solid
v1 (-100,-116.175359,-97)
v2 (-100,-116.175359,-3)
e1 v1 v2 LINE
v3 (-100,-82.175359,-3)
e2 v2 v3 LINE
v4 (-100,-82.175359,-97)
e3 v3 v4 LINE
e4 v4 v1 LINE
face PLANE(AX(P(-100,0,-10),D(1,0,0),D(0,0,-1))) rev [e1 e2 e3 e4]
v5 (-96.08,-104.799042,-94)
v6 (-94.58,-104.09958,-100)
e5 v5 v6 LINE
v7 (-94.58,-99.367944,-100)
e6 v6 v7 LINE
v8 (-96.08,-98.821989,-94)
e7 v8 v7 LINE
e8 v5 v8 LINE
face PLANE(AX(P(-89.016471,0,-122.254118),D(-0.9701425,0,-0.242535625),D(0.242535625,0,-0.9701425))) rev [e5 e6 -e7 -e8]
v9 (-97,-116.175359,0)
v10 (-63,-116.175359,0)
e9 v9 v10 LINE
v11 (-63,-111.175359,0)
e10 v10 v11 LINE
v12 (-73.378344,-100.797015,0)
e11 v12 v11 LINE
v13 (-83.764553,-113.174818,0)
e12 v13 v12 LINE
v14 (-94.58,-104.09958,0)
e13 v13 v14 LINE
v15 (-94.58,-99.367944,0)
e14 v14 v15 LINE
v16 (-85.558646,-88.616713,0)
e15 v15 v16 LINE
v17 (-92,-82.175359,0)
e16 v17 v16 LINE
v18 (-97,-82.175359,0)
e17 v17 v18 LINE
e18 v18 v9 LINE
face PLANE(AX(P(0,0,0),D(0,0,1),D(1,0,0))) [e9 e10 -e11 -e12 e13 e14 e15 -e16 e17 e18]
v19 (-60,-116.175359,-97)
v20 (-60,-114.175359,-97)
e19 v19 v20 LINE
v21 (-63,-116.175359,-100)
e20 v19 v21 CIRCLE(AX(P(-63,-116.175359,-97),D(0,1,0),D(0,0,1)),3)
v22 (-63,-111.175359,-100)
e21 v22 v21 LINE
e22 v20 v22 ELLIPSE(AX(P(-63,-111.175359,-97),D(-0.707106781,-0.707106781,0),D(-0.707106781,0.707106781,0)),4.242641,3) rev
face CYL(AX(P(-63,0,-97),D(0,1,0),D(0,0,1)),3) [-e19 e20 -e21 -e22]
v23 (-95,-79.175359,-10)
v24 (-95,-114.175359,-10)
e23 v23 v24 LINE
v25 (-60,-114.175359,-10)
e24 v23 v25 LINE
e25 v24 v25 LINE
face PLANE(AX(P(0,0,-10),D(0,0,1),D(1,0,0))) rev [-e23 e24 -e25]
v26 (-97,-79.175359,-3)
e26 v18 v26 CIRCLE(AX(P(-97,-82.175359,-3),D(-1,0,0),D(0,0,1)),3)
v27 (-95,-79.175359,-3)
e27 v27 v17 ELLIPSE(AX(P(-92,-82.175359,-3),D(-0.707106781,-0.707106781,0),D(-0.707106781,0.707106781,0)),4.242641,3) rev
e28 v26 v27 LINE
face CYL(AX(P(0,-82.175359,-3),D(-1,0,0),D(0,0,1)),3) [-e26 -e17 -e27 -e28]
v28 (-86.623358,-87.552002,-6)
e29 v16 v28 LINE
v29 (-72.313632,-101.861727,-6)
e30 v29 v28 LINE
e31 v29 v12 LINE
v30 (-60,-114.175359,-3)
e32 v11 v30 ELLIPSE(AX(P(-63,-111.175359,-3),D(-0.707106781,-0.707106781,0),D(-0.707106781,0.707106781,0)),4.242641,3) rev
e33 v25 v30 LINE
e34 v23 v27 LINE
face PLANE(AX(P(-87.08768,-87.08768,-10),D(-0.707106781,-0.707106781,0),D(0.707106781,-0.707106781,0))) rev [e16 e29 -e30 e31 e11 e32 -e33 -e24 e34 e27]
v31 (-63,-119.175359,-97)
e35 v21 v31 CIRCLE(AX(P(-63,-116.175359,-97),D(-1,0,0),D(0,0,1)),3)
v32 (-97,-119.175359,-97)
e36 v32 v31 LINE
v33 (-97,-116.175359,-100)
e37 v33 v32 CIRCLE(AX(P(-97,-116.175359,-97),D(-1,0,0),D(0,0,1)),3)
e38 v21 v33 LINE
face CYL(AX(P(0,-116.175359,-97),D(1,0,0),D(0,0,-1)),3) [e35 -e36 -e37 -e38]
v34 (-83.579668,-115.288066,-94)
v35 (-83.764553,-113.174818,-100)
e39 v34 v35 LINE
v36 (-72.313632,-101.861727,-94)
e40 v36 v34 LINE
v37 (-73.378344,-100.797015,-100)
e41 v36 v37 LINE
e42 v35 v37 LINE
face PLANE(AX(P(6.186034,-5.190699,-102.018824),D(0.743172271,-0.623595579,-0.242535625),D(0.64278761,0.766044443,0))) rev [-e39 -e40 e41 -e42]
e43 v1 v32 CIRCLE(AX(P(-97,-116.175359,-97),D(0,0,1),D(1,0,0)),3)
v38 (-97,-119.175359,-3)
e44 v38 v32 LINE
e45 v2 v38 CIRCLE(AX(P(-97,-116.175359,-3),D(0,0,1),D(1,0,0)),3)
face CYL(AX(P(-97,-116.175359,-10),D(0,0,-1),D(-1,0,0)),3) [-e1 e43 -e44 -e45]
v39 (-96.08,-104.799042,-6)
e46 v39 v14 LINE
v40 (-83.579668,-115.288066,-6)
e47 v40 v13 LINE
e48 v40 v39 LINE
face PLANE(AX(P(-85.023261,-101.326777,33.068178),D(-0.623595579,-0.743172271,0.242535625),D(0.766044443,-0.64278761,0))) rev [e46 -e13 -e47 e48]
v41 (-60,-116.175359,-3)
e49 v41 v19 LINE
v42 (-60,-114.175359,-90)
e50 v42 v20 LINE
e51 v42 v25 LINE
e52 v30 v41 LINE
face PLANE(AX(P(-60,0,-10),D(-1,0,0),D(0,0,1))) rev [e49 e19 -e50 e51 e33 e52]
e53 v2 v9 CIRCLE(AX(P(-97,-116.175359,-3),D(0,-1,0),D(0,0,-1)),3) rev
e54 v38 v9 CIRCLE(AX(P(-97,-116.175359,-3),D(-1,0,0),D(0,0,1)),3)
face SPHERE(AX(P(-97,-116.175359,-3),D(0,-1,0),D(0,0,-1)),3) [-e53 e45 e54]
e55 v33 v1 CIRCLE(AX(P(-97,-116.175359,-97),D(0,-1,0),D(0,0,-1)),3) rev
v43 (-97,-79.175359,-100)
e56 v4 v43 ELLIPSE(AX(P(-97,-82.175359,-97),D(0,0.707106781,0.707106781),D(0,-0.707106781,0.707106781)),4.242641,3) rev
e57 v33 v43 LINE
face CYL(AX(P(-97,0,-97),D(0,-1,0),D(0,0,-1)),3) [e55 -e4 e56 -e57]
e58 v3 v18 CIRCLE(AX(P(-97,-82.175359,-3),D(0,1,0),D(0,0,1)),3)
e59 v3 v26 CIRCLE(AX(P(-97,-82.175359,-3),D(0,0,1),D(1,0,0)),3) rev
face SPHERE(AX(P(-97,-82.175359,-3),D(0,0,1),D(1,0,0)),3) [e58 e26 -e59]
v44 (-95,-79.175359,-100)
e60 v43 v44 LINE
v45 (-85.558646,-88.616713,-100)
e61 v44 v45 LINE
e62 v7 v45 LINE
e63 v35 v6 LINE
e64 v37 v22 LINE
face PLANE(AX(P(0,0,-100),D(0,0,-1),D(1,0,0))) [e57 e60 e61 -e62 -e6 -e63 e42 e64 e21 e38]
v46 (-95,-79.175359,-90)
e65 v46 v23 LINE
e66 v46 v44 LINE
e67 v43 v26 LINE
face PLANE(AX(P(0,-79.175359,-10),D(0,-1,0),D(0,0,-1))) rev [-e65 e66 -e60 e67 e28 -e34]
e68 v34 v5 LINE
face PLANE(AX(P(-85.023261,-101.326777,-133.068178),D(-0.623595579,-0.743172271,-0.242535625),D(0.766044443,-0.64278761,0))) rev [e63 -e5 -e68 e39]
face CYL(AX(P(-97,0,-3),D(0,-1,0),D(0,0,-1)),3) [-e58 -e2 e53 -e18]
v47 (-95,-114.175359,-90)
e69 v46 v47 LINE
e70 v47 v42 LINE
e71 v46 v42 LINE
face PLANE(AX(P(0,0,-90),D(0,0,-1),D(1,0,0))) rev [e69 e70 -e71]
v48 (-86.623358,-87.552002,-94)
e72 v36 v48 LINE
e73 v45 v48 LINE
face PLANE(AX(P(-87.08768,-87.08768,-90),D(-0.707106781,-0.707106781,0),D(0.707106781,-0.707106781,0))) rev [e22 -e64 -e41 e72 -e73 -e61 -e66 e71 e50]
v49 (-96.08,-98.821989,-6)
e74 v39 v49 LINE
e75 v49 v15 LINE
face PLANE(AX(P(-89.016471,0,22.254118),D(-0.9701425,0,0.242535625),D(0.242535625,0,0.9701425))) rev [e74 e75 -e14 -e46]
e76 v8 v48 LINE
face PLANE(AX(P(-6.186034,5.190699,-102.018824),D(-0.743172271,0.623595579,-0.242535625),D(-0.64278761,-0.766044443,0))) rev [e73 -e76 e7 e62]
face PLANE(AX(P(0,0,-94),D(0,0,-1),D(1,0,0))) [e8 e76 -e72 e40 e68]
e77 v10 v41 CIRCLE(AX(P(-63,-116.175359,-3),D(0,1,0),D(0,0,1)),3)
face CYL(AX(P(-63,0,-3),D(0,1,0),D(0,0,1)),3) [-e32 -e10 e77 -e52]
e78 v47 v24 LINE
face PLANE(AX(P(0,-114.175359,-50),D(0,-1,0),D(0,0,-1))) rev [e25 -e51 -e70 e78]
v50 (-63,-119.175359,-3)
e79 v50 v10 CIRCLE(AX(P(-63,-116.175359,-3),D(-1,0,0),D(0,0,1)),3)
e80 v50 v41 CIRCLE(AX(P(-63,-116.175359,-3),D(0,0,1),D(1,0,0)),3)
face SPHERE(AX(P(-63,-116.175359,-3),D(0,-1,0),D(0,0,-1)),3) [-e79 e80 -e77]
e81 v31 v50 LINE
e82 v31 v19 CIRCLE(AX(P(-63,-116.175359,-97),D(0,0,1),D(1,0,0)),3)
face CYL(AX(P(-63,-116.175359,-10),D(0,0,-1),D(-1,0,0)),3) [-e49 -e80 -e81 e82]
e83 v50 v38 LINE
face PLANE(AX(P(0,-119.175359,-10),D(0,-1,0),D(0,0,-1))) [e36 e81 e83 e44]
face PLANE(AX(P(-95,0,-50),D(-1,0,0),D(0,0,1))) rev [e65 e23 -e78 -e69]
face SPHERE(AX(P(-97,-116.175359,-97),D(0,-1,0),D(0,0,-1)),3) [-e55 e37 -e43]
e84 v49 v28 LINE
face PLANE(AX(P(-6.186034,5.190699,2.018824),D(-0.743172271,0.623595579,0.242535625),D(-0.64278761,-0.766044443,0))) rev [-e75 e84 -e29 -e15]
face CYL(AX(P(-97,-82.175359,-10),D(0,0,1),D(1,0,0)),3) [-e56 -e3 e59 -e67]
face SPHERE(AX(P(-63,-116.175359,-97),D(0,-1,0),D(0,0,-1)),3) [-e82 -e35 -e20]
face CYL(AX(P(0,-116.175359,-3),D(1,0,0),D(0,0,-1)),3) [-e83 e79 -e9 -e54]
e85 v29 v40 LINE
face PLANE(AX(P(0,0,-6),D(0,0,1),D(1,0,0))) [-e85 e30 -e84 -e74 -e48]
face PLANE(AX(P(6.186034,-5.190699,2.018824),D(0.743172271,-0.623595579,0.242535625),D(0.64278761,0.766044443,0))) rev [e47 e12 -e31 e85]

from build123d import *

# Parameters (mm, degrees)
EXTRUDE_1_DEPTH = 10
EXTRUDE_3_DEPTH = 40
FILLET_2_R      = 3
FILLET_3_R      = 3


with BuildPart() as part:
    # 草图3 → 凸台-拉伸1 (new body)
    with BuildSketch(Plane.XY):
        Polygon((-100, -79.175359259), (-100, -119.175359259), (-60, -119.175359259), (-60, -114.175359259), (-95, -79.175359259), align=None)
    extrude(amount=-EXTRUDE_1_DEPTH)

    # 草图5 → 切除-放样1 section 0
    with BuildSketch(Plane.XY.offset(-6)):
        with BuildLine():
            Line((-96.08, -104.799041882), (-96.08, -98.821989002))
            Line((-96.08, -98.821989002), (-81.709132385, -81.695455893))
            Line((-81.709132385, -81.695455893), (-66.265676412, -94.654054104))
            Line((-66.265676412, -94.654054104), (-83.579668035, -115.288065824))
            Line((-83.579668035, -115.288065824), (-96.08, -104.799041882))
        make_face()
    # 草图8 → 切除-放样1 section 1
    with BuildSketch(Plane.XY):
        with BuildLine():
            Line((-94.58, -104.099580395), (-94.58, -99.367944353))
            Line((-94.58, -99.367944353), (-80.56006572, -82.659637307))
            Line((-80.56006572, -82.659637307), (-67.414743077, -93.68987269))
            Line((-67.414743077, -93.68987269), (-83.764553285, -113.174817744))
            Line((-83.764553285, -113.174817744), (-94.58, -104.099580395))
        make_face()
    loft(mode=Mode.SUBTRACT)

    # 草图9 → 凸台-拉伸3 (add)
    with BuildSketch(Plane(origin=(0, 0, -10), x_dir=(-1, 0, 0), z_dir=(0, 0, -1))):
        Polygon((95, -79.175359259), (95, -114.175359259), (60, -114.175359259), (60, -119.175359259), (100, -119.175359259), (100, -79.175359259), align=None)
    extrude(amount=EXTRUDE_3_DEPTH)

    # 镜向2: part across plane


with BuildPart() as part_1:
    add(part.part)
    add(part.part.mirror(Plane(origin=(0, 0, -50), x_dir=(1, 0, 0), z_dir=(0, 0, -1))))

    # 圆角2
    fillet_2_edges = [part_1.edges().sort_by_distance(p)[0] for p in [
        (-60, -116.675359259, -100),
        (-60, -116.675359259, 0),
        (-100, -99.175359259, -100),
        (-100, -99.175359259, 0),
        (-100, -79.175359259, -50),
        (-97.5, -79.175359259, 0),
    ]]
    fillet(fillet_2_edges, radius=FILLET_2_R)

    # 圆角3
    fillet_3_edges = [part_1.edges().sort_by_distance(p)[0] for p in [
        (-80, -119.175359259, -100),
        (-80, -119.175359259, 0),
        (-100, -119.175359259, -50),
        (-60, -119.175359259, -50),
        (-99.121320344, -119.175359259, -0.878679656),
        (-99.121320344, -119.175359259, -99.121320344),
        (-60.878679656, -119.175359259, -0.878679656),
        (-60.878679656, -119.175359259, -99.121320344),
    ]]
    fillet(fillet_3_edges, radius=FILLET_3_R)


solid = part_1.part
